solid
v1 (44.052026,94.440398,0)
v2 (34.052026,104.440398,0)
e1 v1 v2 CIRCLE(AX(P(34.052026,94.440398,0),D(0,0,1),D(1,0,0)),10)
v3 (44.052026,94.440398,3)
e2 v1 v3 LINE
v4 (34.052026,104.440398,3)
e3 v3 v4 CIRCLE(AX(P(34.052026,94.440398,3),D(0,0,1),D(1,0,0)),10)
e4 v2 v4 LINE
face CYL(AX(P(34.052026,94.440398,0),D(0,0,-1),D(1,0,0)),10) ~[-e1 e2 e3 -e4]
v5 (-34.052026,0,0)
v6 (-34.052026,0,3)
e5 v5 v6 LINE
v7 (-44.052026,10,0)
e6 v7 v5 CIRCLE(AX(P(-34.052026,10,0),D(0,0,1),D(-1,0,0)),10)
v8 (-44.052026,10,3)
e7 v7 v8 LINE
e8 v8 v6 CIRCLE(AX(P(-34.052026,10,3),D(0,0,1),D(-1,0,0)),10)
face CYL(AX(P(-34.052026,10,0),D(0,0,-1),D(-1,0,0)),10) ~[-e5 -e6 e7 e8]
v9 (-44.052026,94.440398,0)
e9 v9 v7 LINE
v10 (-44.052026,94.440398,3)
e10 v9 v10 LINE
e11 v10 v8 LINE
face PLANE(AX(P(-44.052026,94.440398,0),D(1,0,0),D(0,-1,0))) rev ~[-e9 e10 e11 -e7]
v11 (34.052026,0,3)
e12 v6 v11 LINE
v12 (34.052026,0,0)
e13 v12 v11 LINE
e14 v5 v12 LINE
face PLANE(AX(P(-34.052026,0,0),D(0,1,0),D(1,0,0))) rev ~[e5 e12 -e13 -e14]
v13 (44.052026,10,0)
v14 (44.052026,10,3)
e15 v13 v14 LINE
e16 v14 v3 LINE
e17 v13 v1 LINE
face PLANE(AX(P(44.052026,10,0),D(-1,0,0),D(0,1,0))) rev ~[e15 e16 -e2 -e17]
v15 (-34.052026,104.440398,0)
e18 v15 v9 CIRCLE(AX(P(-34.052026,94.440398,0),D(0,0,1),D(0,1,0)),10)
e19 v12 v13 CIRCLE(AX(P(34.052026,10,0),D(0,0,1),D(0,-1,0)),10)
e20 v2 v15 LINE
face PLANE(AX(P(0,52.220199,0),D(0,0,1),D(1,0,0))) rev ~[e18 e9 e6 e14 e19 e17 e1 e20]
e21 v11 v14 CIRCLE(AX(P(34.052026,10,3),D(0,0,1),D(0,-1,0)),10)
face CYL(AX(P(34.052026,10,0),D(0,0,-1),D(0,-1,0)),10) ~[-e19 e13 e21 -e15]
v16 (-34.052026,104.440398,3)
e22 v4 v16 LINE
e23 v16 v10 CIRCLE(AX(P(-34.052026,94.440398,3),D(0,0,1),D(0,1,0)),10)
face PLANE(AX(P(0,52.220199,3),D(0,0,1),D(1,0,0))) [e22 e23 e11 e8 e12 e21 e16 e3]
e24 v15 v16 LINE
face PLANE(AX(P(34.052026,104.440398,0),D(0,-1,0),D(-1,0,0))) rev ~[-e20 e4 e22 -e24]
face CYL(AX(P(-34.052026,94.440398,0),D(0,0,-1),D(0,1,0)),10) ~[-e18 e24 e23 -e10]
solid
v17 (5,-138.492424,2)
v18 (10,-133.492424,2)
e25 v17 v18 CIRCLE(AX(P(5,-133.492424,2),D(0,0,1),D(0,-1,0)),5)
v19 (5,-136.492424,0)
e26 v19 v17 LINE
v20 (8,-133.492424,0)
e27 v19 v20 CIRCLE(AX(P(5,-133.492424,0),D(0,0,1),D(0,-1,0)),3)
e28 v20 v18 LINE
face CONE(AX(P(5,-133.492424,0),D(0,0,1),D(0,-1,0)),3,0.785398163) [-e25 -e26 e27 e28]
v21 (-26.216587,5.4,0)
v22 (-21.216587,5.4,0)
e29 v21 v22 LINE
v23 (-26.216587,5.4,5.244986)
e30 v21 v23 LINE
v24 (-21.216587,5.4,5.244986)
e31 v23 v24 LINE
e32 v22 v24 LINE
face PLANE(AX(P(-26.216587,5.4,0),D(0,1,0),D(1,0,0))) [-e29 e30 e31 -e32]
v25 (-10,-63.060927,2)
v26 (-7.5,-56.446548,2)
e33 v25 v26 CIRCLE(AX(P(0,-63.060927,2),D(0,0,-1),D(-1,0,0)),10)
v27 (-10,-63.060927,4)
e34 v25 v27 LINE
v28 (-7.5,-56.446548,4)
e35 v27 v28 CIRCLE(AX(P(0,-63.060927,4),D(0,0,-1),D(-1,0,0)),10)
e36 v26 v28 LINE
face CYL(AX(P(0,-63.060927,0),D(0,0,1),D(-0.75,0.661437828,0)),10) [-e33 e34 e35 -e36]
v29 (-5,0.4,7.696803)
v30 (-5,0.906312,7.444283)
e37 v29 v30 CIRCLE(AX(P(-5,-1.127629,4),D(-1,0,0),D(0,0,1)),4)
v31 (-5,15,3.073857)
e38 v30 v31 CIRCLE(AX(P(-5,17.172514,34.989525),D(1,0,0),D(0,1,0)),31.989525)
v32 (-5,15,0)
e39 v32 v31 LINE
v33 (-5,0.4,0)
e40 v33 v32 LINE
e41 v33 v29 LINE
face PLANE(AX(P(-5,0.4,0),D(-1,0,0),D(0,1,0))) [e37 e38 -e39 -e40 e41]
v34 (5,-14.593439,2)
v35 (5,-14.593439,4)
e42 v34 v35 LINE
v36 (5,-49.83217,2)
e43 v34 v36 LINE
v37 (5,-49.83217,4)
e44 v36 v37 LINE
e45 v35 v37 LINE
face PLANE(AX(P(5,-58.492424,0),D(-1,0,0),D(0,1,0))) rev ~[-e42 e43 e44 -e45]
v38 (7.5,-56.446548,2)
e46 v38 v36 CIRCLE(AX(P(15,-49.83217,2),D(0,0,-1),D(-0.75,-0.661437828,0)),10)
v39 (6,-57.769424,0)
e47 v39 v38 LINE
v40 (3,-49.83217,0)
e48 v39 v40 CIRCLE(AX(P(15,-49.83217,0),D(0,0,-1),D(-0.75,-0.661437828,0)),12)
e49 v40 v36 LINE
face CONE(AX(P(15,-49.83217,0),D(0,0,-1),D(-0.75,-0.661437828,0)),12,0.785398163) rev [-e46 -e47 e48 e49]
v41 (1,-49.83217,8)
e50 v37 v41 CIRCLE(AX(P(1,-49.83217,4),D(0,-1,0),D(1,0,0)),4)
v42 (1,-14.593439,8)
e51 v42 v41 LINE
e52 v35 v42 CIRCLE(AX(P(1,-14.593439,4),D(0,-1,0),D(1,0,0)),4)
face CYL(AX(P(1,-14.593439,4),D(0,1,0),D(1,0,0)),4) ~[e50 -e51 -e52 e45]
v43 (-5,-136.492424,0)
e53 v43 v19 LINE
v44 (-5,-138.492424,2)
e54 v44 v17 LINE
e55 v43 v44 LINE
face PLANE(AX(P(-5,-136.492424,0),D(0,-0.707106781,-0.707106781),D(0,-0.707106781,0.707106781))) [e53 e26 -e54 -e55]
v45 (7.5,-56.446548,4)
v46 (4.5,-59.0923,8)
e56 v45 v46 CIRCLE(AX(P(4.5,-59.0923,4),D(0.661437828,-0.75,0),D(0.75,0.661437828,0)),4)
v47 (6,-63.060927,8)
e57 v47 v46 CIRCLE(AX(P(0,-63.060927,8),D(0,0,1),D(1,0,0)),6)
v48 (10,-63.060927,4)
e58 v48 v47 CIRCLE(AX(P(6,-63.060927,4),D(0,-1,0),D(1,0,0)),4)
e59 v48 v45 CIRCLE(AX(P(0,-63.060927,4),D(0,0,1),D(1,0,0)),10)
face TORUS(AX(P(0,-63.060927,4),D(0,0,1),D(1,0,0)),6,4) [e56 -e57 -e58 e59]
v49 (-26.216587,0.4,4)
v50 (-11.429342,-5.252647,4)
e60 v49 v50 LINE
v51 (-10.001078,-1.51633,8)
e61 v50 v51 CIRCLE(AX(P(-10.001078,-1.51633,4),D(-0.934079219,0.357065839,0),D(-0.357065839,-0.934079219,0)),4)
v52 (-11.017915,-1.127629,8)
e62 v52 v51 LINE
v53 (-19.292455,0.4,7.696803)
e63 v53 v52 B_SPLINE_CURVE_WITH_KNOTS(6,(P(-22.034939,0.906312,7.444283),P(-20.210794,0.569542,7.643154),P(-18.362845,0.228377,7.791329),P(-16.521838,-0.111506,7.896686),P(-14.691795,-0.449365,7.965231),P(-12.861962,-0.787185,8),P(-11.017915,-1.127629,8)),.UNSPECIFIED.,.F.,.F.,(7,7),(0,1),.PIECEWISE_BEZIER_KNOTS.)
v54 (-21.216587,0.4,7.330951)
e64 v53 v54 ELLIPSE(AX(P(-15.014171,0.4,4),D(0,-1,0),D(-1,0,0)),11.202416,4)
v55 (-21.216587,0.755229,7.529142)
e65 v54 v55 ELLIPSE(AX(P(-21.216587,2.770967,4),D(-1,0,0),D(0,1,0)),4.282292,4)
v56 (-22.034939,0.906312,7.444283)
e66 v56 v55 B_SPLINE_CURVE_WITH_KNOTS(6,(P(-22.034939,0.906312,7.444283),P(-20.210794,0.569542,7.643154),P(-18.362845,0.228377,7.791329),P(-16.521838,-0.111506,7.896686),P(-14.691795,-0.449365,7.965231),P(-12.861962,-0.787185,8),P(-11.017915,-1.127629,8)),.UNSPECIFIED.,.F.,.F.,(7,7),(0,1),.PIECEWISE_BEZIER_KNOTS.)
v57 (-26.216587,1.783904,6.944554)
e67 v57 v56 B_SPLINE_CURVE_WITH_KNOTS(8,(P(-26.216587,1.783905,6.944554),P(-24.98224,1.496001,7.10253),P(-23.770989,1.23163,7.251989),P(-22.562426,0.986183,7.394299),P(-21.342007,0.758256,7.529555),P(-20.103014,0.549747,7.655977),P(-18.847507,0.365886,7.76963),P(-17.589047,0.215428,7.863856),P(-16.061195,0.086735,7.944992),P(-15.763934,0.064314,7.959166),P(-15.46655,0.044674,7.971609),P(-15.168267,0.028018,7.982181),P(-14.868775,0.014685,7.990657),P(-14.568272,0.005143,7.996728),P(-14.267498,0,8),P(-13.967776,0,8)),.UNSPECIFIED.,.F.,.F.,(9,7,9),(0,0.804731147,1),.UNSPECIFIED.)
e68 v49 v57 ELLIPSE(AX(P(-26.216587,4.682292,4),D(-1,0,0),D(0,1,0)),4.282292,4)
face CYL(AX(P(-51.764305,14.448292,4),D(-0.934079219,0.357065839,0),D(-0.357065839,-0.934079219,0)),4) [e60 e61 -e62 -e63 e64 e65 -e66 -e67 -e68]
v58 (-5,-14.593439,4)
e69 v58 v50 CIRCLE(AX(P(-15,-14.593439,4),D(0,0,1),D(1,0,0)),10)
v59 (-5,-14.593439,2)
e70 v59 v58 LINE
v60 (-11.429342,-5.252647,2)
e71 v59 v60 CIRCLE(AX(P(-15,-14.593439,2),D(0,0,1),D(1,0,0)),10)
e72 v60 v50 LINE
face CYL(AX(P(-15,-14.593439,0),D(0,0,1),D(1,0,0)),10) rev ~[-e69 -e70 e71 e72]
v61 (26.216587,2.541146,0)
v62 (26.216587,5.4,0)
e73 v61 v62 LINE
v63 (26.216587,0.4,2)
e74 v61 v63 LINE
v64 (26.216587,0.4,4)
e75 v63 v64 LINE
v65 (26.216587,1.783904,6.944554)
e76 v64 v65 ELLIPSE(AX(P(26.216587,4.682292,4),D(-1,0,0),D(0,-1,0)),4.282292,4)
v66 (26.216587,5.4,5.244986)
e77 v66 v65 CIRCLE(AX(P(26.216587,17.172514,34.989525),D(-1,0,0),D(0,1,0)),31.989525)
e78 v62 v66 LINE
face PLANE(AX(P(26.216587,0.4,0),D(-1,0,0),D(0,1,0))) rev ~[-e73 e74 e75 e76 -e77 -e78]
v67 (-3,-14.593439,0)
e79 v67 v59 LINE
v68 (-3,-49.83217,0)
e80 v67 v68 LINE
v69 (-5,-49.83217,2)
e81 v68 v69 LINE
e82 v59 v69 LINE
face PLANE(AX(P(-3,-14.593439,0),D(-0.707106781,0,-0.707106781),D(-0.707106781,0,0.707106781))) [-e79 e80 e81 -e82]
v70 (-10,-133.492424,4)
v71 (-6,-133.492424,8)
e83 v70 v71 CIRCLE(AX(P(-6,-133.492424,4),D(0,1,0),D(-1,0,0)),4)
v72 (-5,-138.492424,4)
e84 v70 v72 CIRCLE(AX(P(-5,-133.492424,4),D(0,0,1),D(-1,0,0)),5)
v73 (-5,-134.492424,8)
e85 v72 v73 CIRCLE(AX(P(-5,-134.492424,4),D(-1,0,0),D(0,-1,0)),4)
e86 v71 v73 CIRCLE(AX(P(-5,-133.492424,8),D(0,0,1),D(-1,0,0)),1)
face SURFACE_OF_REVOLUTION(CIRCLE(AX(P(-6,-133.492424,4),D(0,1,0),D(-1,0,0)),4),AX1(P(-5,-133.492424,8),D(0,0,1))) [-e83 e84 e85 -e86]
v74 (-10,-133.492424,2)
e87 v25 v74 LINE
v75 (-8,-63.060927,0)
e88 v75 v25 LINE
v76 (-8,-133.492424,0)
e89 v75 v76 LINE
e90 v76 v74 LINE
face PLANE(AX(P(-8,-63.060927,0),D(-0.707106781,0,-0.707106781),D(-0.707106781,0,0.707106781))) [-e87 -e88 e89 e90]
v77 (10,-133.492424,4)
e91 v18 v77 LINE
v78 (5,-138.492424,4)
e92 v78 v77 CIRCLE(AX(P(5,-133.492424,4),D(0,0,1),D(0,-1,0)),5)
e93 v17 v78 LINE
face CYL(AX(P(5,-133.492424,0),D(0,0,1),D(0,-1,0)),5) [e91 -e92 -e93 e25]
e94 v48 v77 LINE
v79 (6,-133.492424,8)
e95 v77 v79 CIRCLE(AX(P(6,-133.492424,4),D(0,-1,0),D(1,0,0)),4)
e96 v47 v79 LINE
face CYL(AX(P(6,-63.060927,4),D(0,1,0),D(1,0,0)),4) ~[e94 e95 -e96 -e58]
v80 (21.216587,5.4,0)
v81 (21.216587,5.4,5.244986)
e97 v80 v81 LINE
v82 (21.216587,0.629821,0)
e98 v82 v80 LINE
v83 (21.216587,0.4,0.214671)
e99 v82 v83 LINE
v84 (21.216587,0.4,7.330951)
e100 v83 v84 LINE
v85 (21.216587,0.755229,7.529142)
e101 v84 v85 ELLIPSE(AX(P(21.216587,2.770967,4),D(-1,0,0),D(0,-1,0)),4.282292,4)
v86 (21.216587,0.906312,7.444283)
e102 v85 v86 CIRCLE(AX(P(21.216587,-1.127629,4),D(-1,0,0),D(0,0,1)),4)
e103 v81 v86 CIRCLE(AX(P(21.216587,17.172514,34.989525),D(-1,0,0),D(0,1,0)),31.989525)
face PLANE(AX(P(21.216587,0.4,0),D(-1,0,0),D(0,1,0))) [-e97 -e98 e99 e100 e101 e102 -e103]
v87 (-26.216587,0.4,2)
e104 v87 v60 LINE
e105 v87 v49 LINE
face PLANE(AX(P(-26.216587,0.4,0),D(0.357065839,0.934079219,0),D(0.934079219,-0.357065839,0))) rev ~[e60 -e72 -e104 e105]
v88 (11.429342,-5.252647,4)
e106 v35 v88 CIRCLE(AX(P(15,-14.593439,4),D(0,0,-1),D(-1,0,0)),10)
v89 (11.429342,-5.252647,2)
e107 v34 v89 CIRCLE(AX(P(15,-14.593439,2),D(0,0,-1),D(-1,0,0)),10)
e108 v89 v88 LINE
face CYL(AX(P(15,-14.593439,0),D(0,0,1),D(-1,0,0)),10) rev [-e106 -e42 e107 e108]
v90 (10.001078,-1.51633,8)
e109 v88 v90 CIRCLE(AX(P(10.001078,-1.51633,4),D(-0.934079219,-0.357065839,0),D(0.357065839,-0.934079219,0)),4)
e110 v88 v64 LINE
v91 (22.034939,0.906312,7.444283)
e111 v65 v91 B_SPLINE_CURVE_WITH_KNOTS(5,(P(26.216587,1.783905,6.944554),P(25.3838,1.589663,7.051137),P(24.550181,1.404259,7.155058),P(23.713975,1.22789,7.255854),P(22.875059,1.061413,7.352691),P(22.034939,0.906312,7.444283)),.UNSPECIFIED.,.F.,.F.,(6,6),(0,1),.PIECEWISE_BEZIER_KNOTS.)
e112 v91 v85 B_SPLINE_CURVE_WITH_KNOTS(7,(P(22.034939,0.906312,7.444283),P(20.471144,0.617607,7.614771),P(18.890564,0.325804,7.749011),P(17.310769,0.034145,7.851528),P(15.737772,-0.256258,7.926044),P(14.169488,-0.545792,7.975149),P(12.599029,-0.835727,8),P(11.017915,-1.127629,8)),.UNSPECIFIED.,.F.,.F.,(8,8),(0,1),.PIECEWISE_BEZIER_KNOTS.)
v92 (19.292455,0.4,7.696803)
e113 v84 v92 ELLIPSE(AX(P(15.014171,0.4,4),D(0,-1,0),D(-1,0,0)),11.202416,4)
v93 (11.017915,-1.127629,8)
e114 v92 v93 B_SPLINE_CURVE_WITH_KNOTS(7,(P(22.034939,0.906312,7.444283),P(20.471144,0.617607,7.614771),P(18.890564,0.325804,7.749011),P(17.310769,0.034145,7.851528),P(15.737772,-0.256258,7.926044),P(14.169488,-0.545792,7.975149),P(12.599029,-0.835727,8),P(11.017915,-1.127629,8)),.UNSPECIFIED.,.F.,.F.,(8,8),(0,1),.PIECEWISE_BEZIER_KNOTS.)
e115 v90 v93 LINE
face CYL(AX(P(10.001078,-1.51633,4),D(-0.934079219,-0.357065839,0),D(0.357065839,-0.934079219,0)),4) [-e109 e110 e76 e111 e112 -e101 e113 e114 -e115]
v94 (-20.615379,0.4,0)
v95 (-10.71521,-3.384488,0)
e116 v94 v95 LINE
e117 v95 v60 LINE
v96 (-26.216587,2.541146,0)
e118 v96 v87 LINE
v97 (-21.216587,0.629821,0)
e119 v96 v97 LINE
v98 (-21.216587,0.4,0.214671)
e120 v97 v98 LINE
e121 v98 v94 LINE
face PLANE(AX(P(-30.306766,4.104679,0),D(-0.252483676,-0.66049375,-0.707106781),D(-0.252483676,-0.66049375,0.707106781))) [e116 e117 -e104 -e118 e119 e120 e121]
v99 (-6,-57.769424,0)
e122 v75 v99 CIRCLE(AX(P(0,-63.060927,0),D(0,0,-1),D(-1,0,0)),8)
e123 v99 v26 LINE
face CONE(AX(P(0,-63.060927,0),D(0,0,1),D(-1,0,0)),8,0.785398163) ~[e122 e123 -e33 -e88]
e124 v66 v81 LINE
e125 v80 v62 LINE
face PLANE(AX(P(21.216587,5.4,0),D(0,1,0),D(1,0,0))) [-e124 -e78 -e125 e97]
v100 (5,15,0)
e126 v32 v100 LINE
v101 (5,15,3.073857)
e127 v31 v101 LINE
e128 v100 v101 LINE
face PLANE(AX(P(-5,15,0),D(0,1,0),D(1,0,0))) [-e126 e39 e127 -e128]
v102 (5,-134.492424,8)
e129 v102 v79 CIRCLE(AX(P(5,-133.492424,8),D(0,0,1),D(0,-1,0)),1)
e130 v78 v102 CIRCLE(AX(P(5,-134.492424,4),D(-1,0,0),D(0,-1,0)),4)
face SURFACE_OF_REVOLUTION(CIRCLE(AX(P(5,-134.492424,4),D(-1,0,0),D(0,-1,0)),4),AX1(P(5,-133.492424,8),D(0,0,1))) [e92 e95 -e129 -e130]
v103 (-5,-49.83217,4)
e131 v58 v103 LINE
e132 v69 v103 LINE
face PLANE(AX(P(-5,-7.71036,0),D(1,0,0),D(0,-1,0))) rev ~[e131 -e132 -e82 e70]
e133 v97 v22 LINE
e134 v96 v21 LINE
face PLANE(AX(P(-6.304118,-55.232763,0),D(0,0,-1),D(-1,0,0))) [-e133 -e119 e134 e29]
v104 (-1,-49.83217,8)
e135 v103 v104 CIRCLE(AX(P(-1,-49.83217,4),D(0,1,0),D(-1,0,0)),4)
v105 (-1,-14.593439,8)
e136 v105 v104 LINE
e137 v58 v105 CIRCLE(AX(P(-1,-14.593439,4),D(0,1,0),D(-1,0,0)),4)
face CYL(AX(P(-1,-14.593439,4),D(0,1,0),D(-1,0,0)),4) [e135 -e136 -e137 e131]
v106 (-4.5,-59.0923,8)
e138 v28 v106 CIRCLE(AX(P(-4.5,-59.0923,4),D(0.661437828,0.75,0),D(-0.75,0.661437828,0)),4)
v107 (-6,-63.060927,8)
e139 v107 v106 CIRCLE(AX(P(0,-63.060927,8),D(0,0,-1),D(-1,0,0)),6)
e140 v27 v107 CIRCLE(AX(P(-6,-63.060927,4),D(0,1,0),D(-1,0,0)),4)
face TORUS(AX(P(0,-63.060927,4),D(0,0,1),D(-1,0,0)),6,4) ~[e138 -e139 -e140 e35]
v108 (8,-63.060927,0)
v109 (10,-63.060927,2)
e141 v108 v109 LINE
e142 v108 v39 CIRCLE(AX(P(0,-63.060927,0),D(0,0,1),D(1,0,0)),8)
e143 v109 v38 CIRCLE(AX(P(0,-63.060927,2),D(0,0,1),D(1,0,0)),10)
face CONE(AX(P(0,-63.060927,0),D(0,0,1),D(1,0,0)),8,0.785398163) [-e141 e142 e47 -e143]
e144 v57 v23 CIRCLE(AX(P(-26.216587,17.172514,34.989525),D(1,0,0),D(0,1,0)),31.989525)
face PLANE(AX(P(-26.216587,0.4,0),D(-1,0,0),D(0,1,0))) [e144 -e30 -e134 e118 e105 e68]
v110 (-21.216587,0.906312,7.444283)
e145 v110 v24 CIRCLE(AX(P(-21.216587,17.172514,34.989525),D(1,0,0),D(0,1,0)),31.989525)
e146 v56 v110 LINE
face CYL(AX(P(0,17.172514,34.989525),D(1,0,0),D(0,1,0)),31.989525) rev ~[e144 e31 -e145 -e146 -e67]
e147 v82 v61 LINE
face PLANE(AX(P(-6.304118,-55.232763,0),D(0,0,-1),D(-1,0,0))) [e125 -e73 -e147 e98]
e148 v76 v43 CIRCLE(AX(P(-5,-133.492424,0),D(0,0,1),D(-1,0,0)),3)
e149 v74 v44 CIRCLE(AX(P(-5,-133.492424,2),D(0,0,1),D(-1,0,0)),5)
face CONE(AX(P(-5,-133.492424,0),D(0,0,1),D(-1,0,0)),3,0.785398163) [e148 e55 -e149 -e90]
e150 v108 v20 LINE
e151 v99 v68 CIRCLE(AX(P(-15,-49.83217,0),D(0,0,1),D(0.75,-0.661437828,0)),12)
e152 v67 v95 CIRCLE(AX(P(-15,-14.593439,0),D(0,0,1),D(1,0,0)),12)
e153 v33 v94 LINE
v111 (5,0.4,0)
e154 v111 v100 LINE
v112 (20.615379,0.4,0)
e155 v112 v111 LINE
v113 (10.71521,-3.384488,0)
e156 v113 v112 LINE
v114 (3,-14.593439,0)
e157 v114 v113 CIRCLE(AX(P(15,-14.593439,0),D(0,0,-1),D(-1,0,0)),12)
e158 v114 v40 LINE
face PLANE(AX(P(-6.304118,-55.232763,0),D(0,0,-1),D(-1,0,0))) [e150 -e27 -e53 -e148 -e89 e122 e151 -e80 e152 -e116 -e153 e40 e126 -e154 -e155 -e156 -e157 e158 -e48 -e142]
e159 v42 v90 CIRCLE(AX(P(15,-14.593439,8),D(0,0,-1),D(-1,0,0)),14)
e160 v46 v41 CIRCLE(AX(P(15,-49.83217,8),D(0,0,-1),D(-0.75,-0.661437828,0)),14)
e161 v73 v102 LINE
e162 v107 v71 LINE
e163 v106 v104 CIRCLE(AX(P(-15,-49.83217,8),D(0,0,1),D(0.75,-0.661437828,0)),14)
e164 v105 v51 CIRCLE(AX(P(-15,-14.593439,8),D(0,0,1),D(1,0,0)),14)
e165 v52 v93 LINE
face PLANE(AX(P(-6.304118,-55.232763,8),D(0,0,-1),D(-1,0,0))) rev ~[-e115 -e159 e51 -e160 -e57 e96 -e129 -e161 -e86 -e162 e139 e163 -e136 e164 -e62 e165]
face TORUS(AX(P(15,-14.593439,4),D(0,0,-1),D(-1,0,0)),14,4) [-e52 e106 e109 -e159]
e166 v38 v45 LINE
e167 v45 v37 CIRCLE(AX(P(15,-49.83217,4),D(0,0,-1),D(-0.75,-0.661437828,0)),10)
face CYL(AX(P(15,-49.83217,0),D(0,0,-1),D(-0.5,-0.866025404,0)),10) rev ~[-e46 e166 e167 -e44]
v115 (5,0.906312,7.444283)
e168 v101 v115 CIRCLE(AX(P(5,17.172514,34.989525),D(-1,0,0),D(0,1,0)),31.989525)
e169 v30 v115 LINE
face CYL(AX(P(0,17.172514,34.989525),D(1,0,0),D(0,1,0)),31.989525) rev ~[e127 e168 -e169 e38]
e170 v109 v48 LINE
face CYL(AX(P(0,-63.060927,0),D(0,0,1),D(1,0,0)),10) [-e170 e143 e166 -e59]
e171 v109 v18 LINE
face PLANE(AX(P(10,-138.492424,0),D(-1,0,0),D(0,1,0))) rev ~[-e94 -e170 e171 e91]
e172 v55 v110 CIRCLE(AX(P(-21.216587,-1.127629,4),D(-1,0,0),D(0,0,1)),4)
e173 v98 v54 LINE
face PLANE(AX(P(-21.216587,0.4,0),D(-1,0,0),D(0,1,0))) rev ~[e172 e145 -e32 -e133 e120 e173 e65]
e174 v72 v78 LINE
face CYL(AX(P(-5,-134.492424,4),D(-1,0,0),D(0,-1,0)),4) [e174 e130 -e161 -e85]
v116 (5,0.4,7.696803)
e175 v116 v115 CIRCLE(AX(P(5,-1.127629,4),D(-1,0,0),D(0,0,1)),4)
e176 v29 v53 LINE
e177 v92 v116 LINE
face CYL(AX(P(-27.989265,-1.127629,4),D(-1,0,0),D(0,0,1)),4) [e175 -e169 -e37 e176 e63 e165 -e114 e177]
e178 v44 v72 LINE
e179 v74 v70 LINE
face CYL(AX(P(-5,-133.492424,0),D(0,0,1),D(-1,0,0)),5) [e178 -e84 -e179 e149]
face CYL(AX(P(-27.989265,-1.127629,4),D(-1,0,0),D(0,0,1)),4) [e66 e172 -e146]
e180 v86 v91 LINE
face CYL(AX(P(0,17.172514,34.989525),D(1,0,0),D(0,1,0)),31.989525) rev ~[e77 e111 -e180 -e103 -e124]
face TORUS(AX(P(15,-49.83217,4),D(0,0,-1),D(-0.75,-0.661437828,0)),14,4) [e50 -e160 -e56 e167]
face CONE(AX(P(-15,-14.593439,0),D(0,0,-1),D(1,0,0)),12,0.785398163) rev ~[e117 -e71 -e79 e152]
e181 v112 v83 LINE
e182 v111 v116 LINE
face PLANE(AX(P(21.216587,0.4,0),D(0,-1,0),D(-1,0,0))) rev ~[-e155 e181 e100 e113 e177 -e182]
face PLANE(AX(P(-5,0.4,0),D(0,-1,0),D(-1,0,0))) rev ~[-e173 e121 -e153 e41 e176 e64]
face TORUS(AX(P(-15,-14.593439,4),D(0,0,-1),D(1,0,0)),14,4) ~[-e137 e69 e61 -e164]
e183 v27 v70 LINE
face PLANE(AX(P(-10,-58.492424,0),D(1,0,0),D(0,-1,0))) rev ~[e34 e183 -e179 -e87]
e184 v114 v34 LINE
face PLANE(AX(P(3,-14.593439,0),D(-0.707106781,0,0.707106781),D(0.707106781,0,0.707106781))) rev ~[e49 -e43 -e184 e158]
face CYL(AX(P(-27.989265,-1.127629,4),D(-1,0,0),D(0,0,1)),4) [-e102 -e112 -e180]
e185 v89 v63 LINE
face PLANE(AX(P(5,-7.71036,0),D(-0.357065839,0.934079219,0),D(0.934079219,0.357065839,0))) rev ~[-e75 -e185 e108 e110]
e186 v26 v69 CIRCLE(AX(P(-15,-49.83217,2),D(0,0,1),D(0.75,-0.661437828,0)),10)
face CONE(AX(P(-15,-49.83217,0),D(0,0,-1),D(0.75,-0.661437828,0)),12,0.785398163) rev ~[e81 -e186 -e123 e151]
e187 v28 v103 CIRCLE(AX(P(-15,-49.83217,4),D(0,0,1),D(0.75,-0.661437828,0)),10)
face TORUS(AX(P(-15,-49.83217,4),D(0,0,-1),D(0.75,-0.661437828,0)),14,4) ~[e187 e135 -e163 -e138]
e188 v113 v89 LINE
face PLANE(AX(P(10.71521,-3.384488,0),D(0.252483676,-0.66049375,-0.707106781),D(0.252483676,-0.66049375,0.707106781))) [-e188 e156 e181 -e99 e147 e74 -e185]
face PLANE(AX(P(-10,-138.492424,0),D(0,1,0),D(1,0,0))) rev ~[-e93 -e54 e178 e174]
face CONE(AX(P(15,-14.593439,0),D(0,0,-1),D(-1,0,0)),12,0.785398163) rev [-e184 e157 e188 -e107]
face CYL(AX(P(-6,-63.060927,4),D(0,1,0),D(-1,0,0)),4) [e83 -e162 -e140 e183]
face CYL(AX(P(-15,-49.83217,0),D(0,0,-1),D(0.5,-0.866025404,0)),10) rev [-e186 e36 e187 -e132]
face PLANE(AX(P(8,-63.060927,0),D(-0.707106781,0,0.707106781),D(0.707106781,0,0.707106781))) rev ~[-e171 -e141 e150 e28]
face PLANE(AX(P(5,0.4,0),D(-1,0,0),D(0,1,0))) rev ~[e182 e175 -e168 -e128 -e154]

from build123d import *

# Parameters (mm, degrees)
F2_DEPTH      = 3
F1_W          = 10
F1_H          = 50.7820645242
F1_H_2        = 8.1103595249
F1_H_3        = 14.6
F1_W_2        = 5
F1_H_4        = 5
F3_DEPTH      = 8
F4_T1_DEPTH   = 8
F5_R          = 10
F6_R          = 5
F7_R          = 10
F8_R          = 31.9895246327
F9_DEPTH      = 30
F9_DEPTH_BACK = 30
F10_T1_DEPTH  = 44.710583772
F10_T3_DEPTH  = 55.9785297761
F10_T5_DEPTH  = 44.710583772
F10_T7_DEPTH  = 35.23873089
F10_T9_DEPTH  = 70.4314974826
F10_T11_DEPTH = 10
F10_T14_ANGLE = 69.0798918948
F10_T16_ANGLE = 69.0798918948
F10_T18_ANGLE = 41.4096221077
F10_T20_ANGLE = 41.4096221088
F10_T22_ANGLE = 90
F10_T24_ANGLE = 90
F10_T26_ANGLE = 41.4096221088
F10_T28_ANGLE = 41.4096221077
F11_T1_DEPTH  = 70.4314974826
F11_T3_DEPTH  = 35.23873089
F11_T5_DEPTH  = 20.9741913293
F11_T7_DEPTH  = 10
F11_T9_DEPTH  = 20.9741913293
F11_T12_ANGLE = 69.0798918948
F11_T14_ANGLE = 41.4096221077
F11_T16_ANGLE = 41.4096221088
F11_T18_ANGLE = 90
F11_T20_ANGLE = 90
F11_T22_ANGLE = 41.4096221088
F11_T24_ANGLE = 41.4096221077
F11_T26_ANGLE = 69.0798918948


# Not quite as in the source:
# - a fillet or chamfer that OpenCascade refuses, or shapes differently, is made with other operations: its cross-section is extruded or revolved along the edge and cut away or added


with BuildPart() as f2:
    # F0 (on Top) → F2 (new body)
    with BuildSketch(Plane.XY):
        with BuildLine():
            Line((34.0520262078, 104.4403978414), (-34.0520262078, 104.4403978414))
            ThreePointArc((-34.0520262078, 104.4403978414), (-41.1230940197, 101.5114656532), (-44.0520262078, 94.4403978414))
            Line((-44.0520262078, 94.4403978414), (-44.0520262078, 10))
            ThreePointArc((-44.0520262078, 10), (-41.1230940197, 2.9289321881), (-34.0520262078, 0))
            Line((-34.0520262078, 0), (34.0520262078, 0))
            ThreePointArc((34.0520262078, 0), (41.1230940197, 2.9289321881), (44.0520262078, 10))
            Line((44.0520262078, 10), (44.0520262078, 94.4403978414))
            ThreePointArc((44.0520262078, 94.4403978414), (41.1230940197, 101.5114656532), (34.0520262078, 104.4403978414))
        make_face()
    extrude(amount=F2_DEPTH)


with BuildPart() as f3:
    # F1 (on Top) → F3 (new body)
    with BuildSketch(Plane.XY):
        Polygon((5, -58.4924240492), (-5, -58.4924240492), (-10, -58.4924240492), (-10, -138.4924240492), (10, -138.4924240492), (10, -58.4924240492), align=None)
        with Locations((0, -33.1013917871)):
            Rectangle(F1_W, F1_H)
        with Locations((0, -3.6551797625)):
            Rectangle(F1_W, F1_H_2)
        Polygon((-5, -7.7103595249), (-5, 0.4), (-21.2165865879, 0.4), (-26.2165865879, 0.4), align=None)
        Polygon((21.2165865879, 0.4), (5, 0.4), (5, -7.7103595249), (26.2165865879, 0.4), align=None)
        with Locations((0, 7.7)):
            Rectangle(F1_W, F1_H_3)
        with Locations((-23.7165865879, 2.9)):
            Rectangle(F1_W_2, F1_H_4)
        with Locations((23.7165865879, 2.9)):
            Rectangle(F1_W_2, F1_H_4)
    extrude(amount=F3_DEPTH)

    # F4: fillet of radius 10 on 2 edges, made by hand

    # F4_s2 → F4_t1 (join)
    with BuildSketch(Plane.XY):
        with BuildLine():
            ThreePointArc((-10, -58.4924240492), (-6.3397459622, -54.8321700113), (-5, -49.8321700113))
            Line((-5, -49.8321700113), (-5, -58.4924240492))
            Line((-5, -58.4924240492), (-10, -58.4924240492))
        make_face()
        with BuildLine():
            ThreePointArc((10, -58.4924240492), (6.3397459622, -54.8321700113), (5, -49.8321700113))
            Line((5, -49.8321700113), (5, -58.4924240492))
            Line((5, -58.4924240492), (10, -58.4924240492))
        make_face()
    extrude(amount=F4_T1_DEPTH)

    # F5
    f5_edges = [f3.edges().sort_by_distance(p)[0] for p in [
        (10, -58.492424, 4),
        (-10, -58.492424, 4),
    ]]
    fillet(f5_edges, radius=F5_R)

    # F6
    f6_edges = [f3.edges().sort_by_distance(p)[0] for p in [
        (-10, -138.492424, 4),
        (10, -138.492424, 4),
    ]]
    fillet(f6_edges, radius=F6_R)

    # F7
    f7_edges = [f3.edges().sort_by_distance(p)[0] for p in [
        (-5, -7.71036, 4),
        (5, -7.71036, 4),
    ]]
    fillet(f7_edges, radius=F7_R)

    # F8 (on Right) → F9 (cut, two sides)
    with BuildSketch(Plane.YZ) as f9_sk:
        with Locations((17.1725142692, 34.9895246327)):
            Circle(F8_R)
    extrude(amount=-F9_DEPTH, mode=Mode.SUBTRACT)
    extrude(f9_sk.sketch, amount=F9_DEPTH_BACK, mode=Mode.SUBTRACT)

    # F10: fillet of radius 4 on 16 edges, made by hand

    # F10_s2 → F10_t1 (cut)
    with BuildSketch(Plane(origin=(-49.9834696062, 19.1069334895, 0), x_dir=(0, 0, 1), z_dir=(0.9340792186, -0.3570658389, 0))):
        with BuildLine():
            ThreePointArc((4, 8.9874157949), (6.8284271247, 7.8158429197), (8, 4.9874157949))
            Line((8, 4.9874157949), (8, 8.9874157949))
            Line((8, 8.9874157949), (4, 8.9874157949))
        make_face()
    extrude(amount=F10_T1_DEPTH, mode=Mode.SUBTRACT)

    # F10_s4 → F10_t3 (cut)
    with BuildSketch(Plane.YZ.offset(-27.9892648881)):
        with BuildLine():
            ThreePointArc((-1.1276290725, 8), (-0.0733831244, 7.8585703934), (0.9063120288, 7.4442827405))
            ThreePointArc((0.9063120288, 7.4442827405), (0.4508473107, 7.7183761355), (0, 8))
            Line((0, 8), (-1.1276290725, 8))
        make_face()
    extrude(amount=F10_T3_DEPTH, mode=Mode.SUBTRACT)

    # F10_s6 → F10_t5 (cut)
    with BuildSketch(Plane(origin=(8.2202424512, 3.1423113885, 0), x_dir=(0, 0, 1), z_dir=(0.9340792186, 0.3570658389, 0))):
        with BuildLine():
            ThreePointArc((4, 8.9874157949), (6.8284271247, 7.8158429197), (8, 4.9874157949))
            Line((8, 4.9874157949), (8, 8.9874157949))
            Line((8, 8.9874157949), (4, 8.9874157949))
        make_face()
    extrude(amount=F10_T5_DEPTH, mode=Mode.SUBTRACT)

    # F10_s8 → F10_t7 (cut)
    with BuildSketch(Plane.XZ.offset(14.5934391213)):
        with BuildLine():
            ThreePointArc((5, 4), (3.8284271247, 6.8284271247), (1, 8))
            Line((1, 8), (5, 8))
            Line((5, 8), (5, 4))
        make_face()
        with BuildLine():
            ThreePointArc((-5, 4), (-3.8284271247, 6.8284271247), (-1, 8))
            Line((-1, 8), (-5, 8))
            Line((-5, 8), (-5, 4))
        make_face()
    extrude(amount=F10_T7_DEPTH, mode=Mode.SUBTRACT)

    # F10_s10 → F10_t9 (cut)
    with BuildSketch(Plane.XZ.offset(63.0609265666)):
        with BuildLine():
            ThreePointArc((10, 4), (8.8284271247, 6.8284271247), (6, 8))
            Line((6, 8), (10, 8))
            Line((10, 8), (10, 4))
        make_face()
        with BuildLine():
            ThreePointArc((-10, 4), (-8.8284271247, 6.8284271247), (-6, 8))
            Line((-6, 8), (-10, 8))
            Line((-10, 8), (-10, 4))
        make_face()
    extrude(amount=F10_T9_DEPTH, mode=Mode.SUBTRACT)

    # F10_s12 → F10_t11 (cut)
    with BuildSketch(Plane.YZ.offset(-5)):
        with BuildLine():
            ThreePointArc((-138.4924240492, 4), (-137.3208511739, 6.8284271247), (-134.4924240492, 8))
            Line((-134.4924240492, 8), (-138.4924240492, 8))
            Line((-138.4924240492, 8), (-138.4924240492, 4))
        make_face()
    extrude(amount=F10_T11_DEPTH, mode=Mode.SUBTRACT)

    # F10_s13 → F10_t14 (revolve, cut)
    with BuildSketch(Plane.XZ.offset(14.5934391213)):
        with BuildLine():
            ThreePointArc((-5, 4), (-3.8284271247, 6.8284271247), (-1, 8))
            Line((-1, 8), (-5, 8))
            Line((-5, 8), (-5, 4))
        make_face()
    revolve(axis=Axis((-15, -14.5934391213, 8), (0, 0, 1)), revolution_arc=F10_T14_ANGLE, mode=Mode.SUBTRACT)

    # F10_s15 → F10_t16 (revolve, cut)
    with BuildSketch(Plane.XZ.offset(14.5934391213)):
        with BuildLine():
            ThreePointArc((5, 4), (3.8284271247, 6.8284271247), (1, 8))
            Line((1, 8), (5, 8))
            Line((5, 8), (5, 4))
        make_face()
    revolve(axis=Axis((15, -14.5934391213, 8), (0, 0, -1)), revolution_arc=F10_T16_ANGLE, mode=Mode.SUBTRACT)

    # F10_s17 → F10_t18 (revolve, cut)
    with BuildSketch(Plane(origin=(31.2831617138, -35.4717711942, 0), x_dir=(0, 0, 1), z_dir=(0.6614378278, -0.75, 0))):
        with BuildLine():
            ThreePointArc((4, 31.7108822847), (6.8284271247, 32.88245516), (8, 35.7108822847))
            Line((8, 35.7108822847), (8, 31.7108822847))
            Line((8, 31.7108822847), (4, 31.7108822847))
        make_face()
    revolve(axis=Axis((15.0000000004, -49.8321700111, 8), (0, 0, -1)), revolution_arc=F10_T18_ANGLE, mode=Mode.SUBTRACT)

    # F10_s19 → F10_t20 (revolve, cut)
    with BuildSketch(Plane.XZ.offset(63.0609265666)):
        with BuildLine():
            ThreePointArc((10, 4), (8.8284271247, 6.8284271247), (6, 8))
            Line((6, 8), (10, 8))
            Line((10, 8), (10, 4))
        make_face()
    revolve(axis=Axis((0, -63.0609265666, 8), (0, 0, 1)), revolution_arc=F10_T20_ANGLE, mode=Mode.SUBTRACT)

    # F10_s21 → F10_t22 (revolve, cut)
    with BuildSketch(Plane.YZ.offset(5)):
        with BuildLine():
            ThreePointArc((-138.4924240492, 4), (-137.3208511739, 6.8284271247), (-134.4924240492, 8))
            Line((-134.4924240492, 8), (-138.4924240492, 8))
            Line((-138.4924240492, 8), (-138.4924240492, 4))
        make_face()
    revolve(axis=Axis((5, -133.4924240492, 8), (0, 0, 1)), revolution_arc=F10_T22_ANGLE, mode=Mode.SUBTRACT)

    # F10_s23 → F10_t24 (revolve, cut)
    with BuildSketch(Plane.XZ.offset(133.4924240492)):
        with BuildLine():
            ThreePointArc((-10, 4), (-8.8284271247, 6.8284271247), (-6, 8))
            Line((-6, 8), (-10, 8))
            Line((-10, 8), (-10, 4))
        make_face()
    revolve(axis=Axis((-5, -133.4924240492, 8), (0, 0, 1)), revolution_arc=F10_T24_ANGLE, mode=Mode.SUBTRACT)

    # F10_s25 → F10_t26 (revolve, cut)
    with BuildSketch(Plane.XZ.offset(63.0609265666)):
        with BuildLine():
            ThreePointArc((-10, 4), (-8.8284271247, 6.8284271247), (-6, 8))
            Line((-6, 8), (-10, 8))
            Line((-10, 8), (-10, 4))
        make_face()
    revolve(axis=Axis((0, -63.0609265666, 8), (0, 0, -1)), revolution_arc=F10_T26_ANGLE, mode=Mode.SUBTRACT)

    # F10_s27 → F10_t28 (revolve, cut)
    with BuildSketch(Plane(origin=(-31.2831617138, -35.4717711942, 0), x_dir=(0, 0, 1), z_dir=(-0.6614378278, -0.75, 0))):
        with BuildLine():
            ThreePointArc((4, -31.7108822847), (6.8284271247, -32.88245516), (8, -35.7108822847))
            Line((8, -35.7108822847), (8, -31.7108822847))
            Line((8, -31.7108822847), (4, -31.7108822847))
        make_face()
    revolve(axis=Axis((-15.0000000004, -49.8321700111, 8), (0, 0, 1)), revolution_arc=F10_T28_ANGLE, mode=Mode.SUBTRACT)

    # F11: chamfer of 2 on 15 edges, made by hand

    # F11_s2 → F11_t1 (cut)
    with BuildSketch(Plane.XZ.offset(63.0609265666)):
        Polygon((-8, 0), (-10, 2), (-10, 0), align=None)
        Polygon((8, 0), (10, 2), (10, 0), align=None)
    extrude(amount=F11_T1_DEPTH, mode=Mode.SUBTRACT)

    # F11_s4 → F11_t3 (cut)
    with BuildSketch(Plane.XZ.offset(14.5934391213)):
        Polygon((-3, 0), (-5, 2), (-5, 0), align=None)
        Polygon((3, 0), (5, 2), (5, 0), align=None)
    extrude(amount=F11_T3_DEPTH, mode=Mode.SUBTRACT)

    # F11_s6 → F11_t5 (cut)
    with BuildSketch(Plane(origin=(-27.8117986999, 10.6314786102, 0), x_dir=(0, 0, 1), z_dir=(0.9340792186, -0.3570658389, 0))):
        Polygon((0, 6.9874157949), (2, 8.9874157949), (0, 8.9874157949), align=None)
    extrude(amount=F11_T5_DEPTH, mode=Mode.SUBTRACT)

    # F11_s8 → F11_t7 (cut)
    with BuildSketch(Plane.YZ.offset(-5)):
        Polygon((-136.4924240492, 0), (-138.4924240492, 2), (-138.4924240492, 0), align=None)
    extrude(amount=F11_T7_DEPTH, mode=Mode.SUBTRACT)

    # F11_s10 → F11_t9 (cut)
    with BuildSketch(Plane(origin=(8.2202424512, 3.1423113885, 0), x_dir=(0, 0, 1), z_dir=(0.9340792186, 0.3570658389, 0))):
        Polygon((0, 6.9874157949), (2, 8.9874157949), (0, 8.9874157949), align=None)
    extrude(amount=F11_T9_DEPTH, mode=Mode.SUBTRACT)

    # F11_s11 → F11_t12 (revolve, cut)
    with BuildSketch(Plane.XZ.offset(14.5934391213)):
        Polygon((-3, 0), (-5, 2), (-5, 0), align=None)
    revolve(axis=Axis((-15, -14.5934391213, 0), (0, 0, 1)), revolution_arc=F11_T12_ANGLE, mode=Mode.SUBTRACT)

    # F11_s13 → F11_t14 (revolve, cut)
    with BuildSketch(Plane(origin=(-31.2831617138, -35.4717711942, 0), x_dir=(0, 0, 1), z_dir=(-0.6614378278, -0.75, 0))):
        Polygon((0, -33.7108822847), (2, -31.7108822847), (0, -31.7108822847), align=None)
    revolve(axis=Axis((-15.0000000004, -49.8321700111, 0), (0, 0, 1)), revolution_arc=F11_T14_ANGLE, mode=Mode.SUBTRACT)

    # F11_s15 → F11_t16 (revolve, cut)
    with BuildSketch(Plane.XZ.offset(63.0609265666)):
        Polygon((-8, 0), (-10, 2), (-10, 0), align=None)
    revolve(axis=Axis((0, -63.0609265666, 0), (0, 0, -1)), revolution_arc=F11_T16_ANGLE, mode=Mode.SUBTRACT)

    # F11_s17 → F11_t18 (revolve, cut)
    with BuildSketch(Plane.XZ.offset(133.4924240492)):
        Polygon((-8, 0), (-10, 2), (-10, 0), align=None)
    revolve(axis=Axis((-5, -133.4924240492, 0), (0, 0, 1)), revolution_arc=F11_T18_ANGLE, mode=Mode.SUBTRACT)

    # F11_s19 → F11_t20 (revolve, cut)
    with BuildSketch(Plane.YZ.offset(5)):
        Polygon((-136.4924240492, 0), (-138.4924240492, 2), (-138.4924240492, 0), align=None)
    revolve(axis=Axis((5, -133.4924240492, 0), (0, 0, 1)), revolution_arc=F11_T20_ANGLE, mode=Mode.SUBTRACT)

    # F11_s21 → F11_t22 (revolve, cut)
    with BuildSketch(Plane.XZ.offset(63.0609265666)):
        Polygon((8, 0), (10, 2), (10, 0), align=None)
    revolve(axis=Axis((0, -63.0609265666, 0), (0, 0, 1)), revolution_arc=F11_T22_ANGLE, mode=Mode.SUBTRACT)

    # F11_s23 → F11_t24 (revolve, cut)
    with BuildSketch(Plane(origin=(31.2831617138, -35.4717711942, 0), x_dir=(0, 0, 1), z_dir=(0.6614378278, -0.75, 0))):
        Polygon((0, 33.7108822847), (2, 31.7108822847), (0, 31.7108822847), align=None)
    revolve(axis=Axis((15.0000000004, -49.8321700111, 0), (0, 0, -1)), revolution_arc=F11_T24_ANGLE, mode=Mode.SUBTRACT)

    # F11_s25 → F11_t26 (revolve, cut)
    with BuildSketch(Plane.XZ.offset(14.5934391213)):
        Polygon((3, 0), (5, 2), (5, 0), align=None)
    revolve(axis=Axis((15, -14.5934391213, 0), (0, 0, -1)), revolution_arc=F11_T26_ANGLE, mode=Mode.SUBTRACT)


solid = Compound([f2.part, f3.part])
